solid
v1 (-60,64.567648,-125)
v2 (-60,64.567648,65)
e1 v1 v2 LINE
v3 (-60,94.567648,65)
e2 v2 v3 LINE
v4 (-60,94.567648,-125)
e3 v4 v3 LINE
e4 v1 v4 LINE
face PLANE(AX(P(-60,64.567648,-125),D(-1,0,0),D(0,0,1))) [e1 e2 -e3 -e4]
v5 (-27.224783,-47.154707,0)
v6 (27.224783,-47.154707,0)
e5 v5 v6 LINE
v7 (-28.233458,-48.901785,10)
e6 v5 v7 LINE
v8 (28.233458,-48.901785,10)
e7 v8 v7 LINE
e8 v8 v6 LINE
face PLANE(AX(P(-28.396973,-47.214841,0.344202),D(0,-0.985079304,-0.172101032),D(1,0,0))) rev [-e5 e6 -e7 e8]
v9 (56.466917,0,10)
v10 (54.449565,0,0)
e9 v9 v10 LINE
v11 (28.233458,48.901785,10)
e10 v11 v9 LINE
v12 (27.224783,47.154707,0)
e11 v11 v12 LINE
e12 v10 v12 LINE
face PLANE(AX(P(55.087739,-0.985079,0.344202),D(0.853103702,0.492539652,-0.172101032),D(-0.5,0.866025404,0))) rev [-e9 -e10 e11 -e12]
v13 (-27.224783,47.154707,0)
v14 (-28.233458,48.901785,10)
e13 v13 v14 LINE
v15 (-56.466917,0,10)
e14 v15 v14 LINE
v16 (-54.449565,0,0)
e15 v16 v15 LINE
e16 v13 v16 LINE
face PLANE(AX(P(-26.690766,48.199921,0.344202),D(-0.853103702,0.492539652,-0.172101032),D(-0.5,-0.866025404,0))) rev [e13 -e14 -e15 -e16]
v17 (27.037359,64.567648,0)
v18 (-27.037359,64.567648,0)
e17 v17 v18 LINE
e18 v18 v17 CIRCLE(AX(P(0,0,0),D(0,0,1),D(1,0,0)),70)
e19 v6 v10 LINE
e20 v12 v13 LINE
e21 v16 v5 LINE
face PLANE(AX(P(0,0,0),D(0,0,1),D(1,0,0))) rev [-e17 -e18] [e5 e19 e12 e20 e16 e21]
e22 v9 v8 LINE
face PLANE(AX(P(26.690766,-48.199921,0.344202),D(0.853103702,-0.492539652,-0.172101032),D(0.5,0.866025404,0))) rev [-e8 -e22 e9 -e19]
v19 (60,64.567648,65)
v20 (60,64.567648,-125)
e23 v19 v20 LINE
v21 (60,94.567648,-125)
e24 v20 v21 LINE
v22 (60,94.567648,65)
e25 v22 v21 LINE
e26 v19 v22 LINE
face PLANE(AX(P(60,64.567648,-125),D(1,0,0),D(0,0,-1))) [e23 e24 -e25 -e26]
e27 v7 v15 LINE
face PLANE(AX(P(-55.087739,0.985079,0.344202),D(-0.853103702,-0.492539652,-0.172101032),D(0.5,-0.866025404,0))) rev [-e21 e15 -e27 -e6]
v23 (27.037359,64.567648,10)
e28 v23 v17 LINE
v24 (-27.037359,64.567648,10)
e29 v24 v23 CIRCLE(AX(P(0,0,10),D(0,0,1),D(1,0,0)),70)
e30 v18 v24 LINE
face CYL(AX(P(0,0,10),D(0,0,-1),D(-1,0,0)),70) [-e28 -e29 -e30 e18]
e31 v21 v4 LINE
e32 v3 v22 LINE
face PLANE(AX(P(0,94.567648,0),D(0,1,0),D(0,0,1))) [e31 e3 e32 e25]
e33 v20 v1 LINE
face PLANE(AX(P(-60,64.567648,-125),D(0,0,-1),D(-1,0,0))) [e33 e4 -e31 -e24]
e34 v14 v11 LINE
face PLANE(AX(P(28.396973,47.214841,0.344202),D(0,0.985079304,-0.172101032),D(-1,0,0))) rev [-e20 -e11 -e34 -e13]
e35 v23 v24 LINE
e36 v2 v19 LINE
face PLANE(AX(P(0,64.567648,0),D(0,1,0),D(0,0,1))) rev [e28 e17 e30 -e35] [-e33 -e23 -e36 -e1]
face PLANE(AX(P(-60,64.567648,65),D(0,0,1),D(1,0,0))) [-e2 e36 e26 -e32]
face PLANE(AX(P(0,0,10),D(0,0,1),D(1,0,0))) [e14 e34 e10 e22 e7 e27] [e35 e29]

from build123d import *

# Parameters (mm, degrees)
ESQUISSE1_R               = 70
BOSS_EXTRU_1_DEPTH        = 10
CHANFREIN1_SIZE           = 10.000000024
CHANFREIN1_SIZE_2         = 1.74707794
D_PLACER_START            = -32.160153846
D_PLACER_LA_FACE1_DEPTH   = 61.565802755
D_PLACER_START_2          = -29.405648909
D_PLACER_LA_FACE1_2_DEPTH = 58.811297818
D_PLACER_LA_FACE1_3_DEPTH = 58.811297818
ESQUISSE2_W               = 120
ESQUISSE2_H               = 190
BOSS_EXTRU_2_DEPTH        = 30


with BuildPart() as part:
    # Esquisse1 → Boss.-Extru.1 (new body)
    with BuildSketch(Plane.XY):
        Circle(ESQUISSE1_R)
        Polygon((56.79394598, 0), (28.39697299, 49.185), (-28.39697299, 49.185), (-56.79394598, 0), (-28.39697299, -49.185), (28.39697299, -49.185), align=None, mode=Mode.SUBTRACT)
    extrude(amount=BOSS_EXTRU_1_DEPTH)

    # Chanfrein1
    # the kernel refuses this chamfer: 10.000000024, 1.74707794 mm, written as the material it takes off along each edge
    with BuildSketch(Plane(origin=(-54.38262227, -49.185, 10), x_dir=(0, 0, -1), z_dir=(1, 0, 0))) as chanfrein1_piece_1_section:
        Polygon((CHANFREIN1_SIZE, 0), (0, -CHANFREIN1_SIZE_2), (0, 0), align=None)
    chanfrein1_piece_1 = extrude(amount=108.76524454, mode=Mode.PRIVATE)
    chanfrein1_piece_1 = split(chanfrein1_piece_1, bisect_by=Plane(origin=(7.702074175, -85.029616205, 10), z_dir=(-0.8660254037844389, 0.4999999999999996, 0)), keep=Keep.TOP, mode=Mode.PRIVATE)
    chanfrein1_piece_1 = split(chanfrein1_piece_1, bisect_by=Plane(origin=(-34.89338531, -37.932883795, 10), z_dir=(0.8660254037844386, 0.5000000000000001, 0)), keep=Keep.TOP, mode=Mode.PRIVATE)
    add(chanfrein1_piece_1, mode=Mode.SUBTRACT)
    with BuildSketch(Plane(origin=(15.40414835, -71.68923241, 10), x_dir=(0, 0, -1), z_dir=(0.4999999999999996, 0.8660254037844389, 0))) as chanfrein1_piece_2_section:
        Polygon((CHANFREIN1_SIZE, 0), (0, -CHANFREIN1_SIZE_2), (0, 0), align=None)
    chanfrein1_piece_2 = extrude(amount=108.76524454, mode=Mode.PRIVATE)
    chanfrein1_piece_2 = split(chanfrein1_piece_2, bisect_by=Plane(origin=(15.40414835, -49.185, 10), z_dir=(0, 1, 0)), keep=Keep.TOP, mode=Mode.PRIVATE)
    chanfrein1_piece_2 = split(chanfrein1_piece_2, bisect_by=Plane(origin=(77.488844795, -35.844616205, 10), z_dir=(-0.8660254037844386, -0.5000000000000001, 0)), keep=Keep.TOP, mode=Mode.PRIVATE)
    add(chanfrein1_piece_2, mode=Mode.SUBTRACT)
    with BuildSketch(Plane(origin=(69.78677062, -22.50423241, 10), x_dir=(0, 0, -1), z_dir=(-0.5000000000000001, 0.8660254037844386, 0))) as chanfrein1_piece_3_section:
        Polygon((CHANFREIN1_SIZE, 0), (0, -CHANFREIN1_SIZE_2), (0, 0), align=None)
    chanfrein1_piece_3 = extrude(amount=108.76524454, mode=Mode.PRIVATE)
    chanfrein1_piece_3 = split(chanfrein1_piece_3, bisect_by=Plane(origin=(50.29753366, -11.252116205, 10), z_dir=(-0.8660254037844389, 0.4999999999999996, 0)), keep=Keep.TOP, mode=Mode.PRIVATE)
    chanfrein1_piece_3 = split(chanfrein1_piece_3, bisect_by=Plane(origin=(69.78677062, 49.185, 10), z_dir=(0, -1, 0)), keep=Keep.TOP, mode=Mode.PRIVATE)
    add(chanfrein1_piece_3, mode=Mode.SUBTRACT)
    with BuildSketch(Plane(origin=(54.38262227, 49.185, 10), x_dir=(0, 0, -1), z_dir=(-1, 0, 0))) as chanfrein1_piece_4_section:
        Polygon((CHANFREIN1_SIZE, 0), (0, -CHANFREIN1_SIZE_2), (0, 0), align=None)
    chanfrein1_piece_4 = extrude(amount=108.76524454, mode=Mode.PRIVATE)
    chanfrein1_piece_4 = split(chanfrein1_piece_4, bisect_by=Plane(origin=(-7.702074175, 85.029616205, 10), z_dir=(0.8660254037844388, -0.4999999999999998, 0)), keep=Keep.TOP, mode=Mode.PRIVATE)
    chanfrein1_piece_4 = split(chanfrein1_piece_4, bisect_by=Plane(origin=(34.89338531, 37.932883795, 10), z_dir=(-0.8660254037844386, -0.5000000000000001, 0)), keep=Keep.TOP, mode=Mode.PRIVATE)
    add(chanfrein1_piece_4, mode=Mode.SUBTRACT)
    with BuildSketch(Plane(origin=(-15.40414835, 71.68923241, 10), x_dir=(0, 0, -1), z_dir=(-0.4999999999999998, -0.8660254037844388, 0))) as chanfrein1_piece_5_section:
        Polygon((CHANFREIN1_SIZE, 0), (0, -CHANFREIN1_SIZE_2), (0, 0), align=None)
    chanfrein1_piece_5 = extrude(amount=108.76524454, mode=Mode.PRIVATE)
    chanfrein1_piece_5 = split(chanfrein1_piece_5, bisect_by=Plane(origin=(-77.488844795, 35.844616205, 10), z_dir=(0.8660254037844386, 0.5000000000000001, 0)), keep=Keep.TOP, mode=Mode.PRIVATE)
    chanfrein1_piece_5 = split(chanfrein1_piece_5, bisect_by=Plane(origin=(-15.40414835, 49.185, 10), z_dir=(0, -1, 0)), keep=Keep.TOP, mode=Mode.PRIVATE)
    add(chanfrein1_piece_5, mode=Mode.SUBTRACT)
    with BuildSketch(Plane(origin=(-69.78677062, 22.50423241, 10), x_dir=(0, 0, -1), z_dir=(0.5000000000000001, -0.8660254037844386, 0))) as chanfrein1_piece_6_section:
        Polygon((CHANFREIN1_SIZE, 0), (0, -CHANFREIN1_SIZE_2), (0, 0), align=None)
    chanfrein1_piece_6 = extrude(amount=108.76524454, mode=Mode.PRIVATE)
    chanfrein1_piece_6 = split(chanfrein1_piece_6, bisect_by=Plane(origin=(-69.78677062, -49.185, 10), z_dir=(0, 1, 0)), keep=Keep.TOP, mode=Mode.PRIVATE)
    chanfrein1_piece_6 = split(chanfrein1_piece_6, bisect_by=Plane(origin=(-50.29753366, 11.252116205, 10), z_dir=(0.8660254037844388, -0.4999999999999998, 0)), keep=Keep.TOP, mode=Mode.PRIVATE)
    add(chanfrein1_piece_6, mode=Mode.SUBTRACT)
    with BuildSketch(Plane(origin=(-54.38262227, -49.185, 10), x_dir=(0, 0, -1), z_dir=(1, 0, 0))) as chanfrein1_piece_7a_section:
        Polygon((CHANFREIN1_SIZE, 0), (0, -CHANFREIN1_SIZE_2), (0, 0), align=None)
    chanfrein1_piece_7a = extrude(amount=108.76524454, mode=Mode.PRIVATE)
    chanfrein1_piece_7a = split(chanfrein1_piece_7a, bisect_by=Plane(origin=(-34.89338531, -37.932883795, 10), z_dir=(-0.8660254037844386, -0.5000000000000001, 0)), keep=Keep.TOP, mode=Mode.PRIVATE)
    with BuildSketch(Plane(origin=(-69.78677062, 22.50423241, 10), x_dir=(0, 0, -1), z_dir=(0.5000000000000001, -0.8660254037844386, 0))) as chanfrein1_piece_7b_section:
        Polygon((CHANFREIN1_SIZE, 0), (0, -CHANFREIN1_SIZE_2), (0, 0), align=None)
    chanfrein1_piece_7b = extrude(amount=108.76524454, mode=Mode.PRIVATE)
    chanfrein1_piece_7b = split(chanfrein1_piece_7b, bisect_by=Plane(origin=(-69.78677062, -49.185, 10), z_dir=(0, -1, 0)), keep=Keep.TOP, mode=Mode.PRIVATE)
    chanfrein1_piece_7 = chanfrein1_piece_7a & chanfrein1_piece_7b
    add(chanfrein1_piece_7, mode=Mode.SUBTRACT)
    with BuildSketch(Plane(origin=(15.40414835, -71.68923241, 10), x_dir=(0, 0, -1), z_dir=(0.4999999999999996, 0.8660254037844389, 0))) as chanfrein1_piece_8a_section:
        Polygon((CHANFREIN1_SIZE, 0), (0, -CHANFREIN1_SIZE_2), (0, 0), align=None)
    chanfrein1_piece_8a = extrude(amount=108.76524454, mode=Mode.PRIVATE)
    chanfrein1_piece_8a = split(chanfrein1_piece_8a, bisect_by=Plane(origin=(15.40414835, -49.185, 10), z_dir=(0, -1, 0)), keep=Keep.TOP, mode=Mode.PRIVATE)
    with BuildSketch(Plane(origin=(-54.38262227, -49.185, 10), x_dir=(0, 0, -1), z_dir=(1, 0, 0))) as chanfrein1_piece_8b_section:
        Polygon((CHANFREIN1_SIZE, 0), (0, -CHANFREIN1_SIZE_2), (0, 0), align=None)
    chanfrein1_piece_8b = extrude(amount=108.76524454, mode=Mode.PRIVATE)
    chanfrein1_piece_8b = split(chanfrein1_piece_8b, bisect_by=Plane(origin=(7.702074175, -85.029616205, 10), z_dir=(0.8660254037844389, -0.4999999999999996, 0)), keep=Keep.TOP, mode=Mode.PRIVATE)
    chanfrein1_piece_8 = chanfrein1_piece_8a & chanfrein1_piece_8b
    add(chanfrein1_piece_8, mode=Mode.SUBTRACT)
    with BuildSketch(Plane(origin=(15.40414835, -71.68923241, 10), x_dir=(0, 0, -1), z_dir=(0.4999999999999996, 0.8660254037844389, 0))) as chanfrein1_piece_9a_section:
        Polygon((CHANFREIN1_SIZE, 0), (0, -CHANFREIN1_SIZE_2), (0, 0), align=None)
    chanfrein1_piece_9a = extrude(amount=108.76524454, mode=Mode.PRIVATE)
    chanfrein1_piece_9a = split(chanfrein1_piece_9a, bisect_by=Plane(origin=(77.488844795, -35.844616205, 10), z_dir=(0.8660254037844386, 0.5000000000000001, 0)), keep=Keep.TOP, mode=Mode.PRIVATE)
    with BuildSketch(Plane(origin=(69.78677062, -22.50423241, 10), x_dir=(0, 0, -1), z_dir=(-0.5000000000000001, 0.8660254037844386, 0))) as chanfrein1_piece_9b_section:
        Polygon((CHANFREIN1_SIZE, 0), (0, -CHANFREIN1_SIZE_2), (0, 0), align=None)
    chanfrein1_piece_9b = extrude(amount=108.76524454, mode=Mode.PRIVATE)
    chanfrein1_piece_9b = split(chanfrein1_piece_9b, bisect_by=Plane(origin=(50.29753366, -11.252116205, 10), z_dir=(0.8660254037844389, -0.4999999999999996, 0)), keep=Keep.TOP, mode=Mode.PRIVATE)
    chanfrein1_piece_9 = chanfrein1_piece_9a & chanfrein1_piece_9b
    add(chanfrein1_piece_9, mode=Mode.SUBTRACT)
    with BuildSketch(Plane(origin=(54.38262227, 49.185, 10), x_dir=(0, 0, -1), z_dir=(-1, 0, 0))) as chanfrein1_piece_10a_section:
        Polygon((CHANFREIN1_SIZE, 0), (0, -CHANFREIN1_SIZE_2), (0, 0), align=None)
    chanfrein1_piece_10a = extrude(amount=108.76524454, mode=Mode.PRIVATE)
    chanfrein1_piece_10a = split(chanfrein1_piece_10a, bisect_by=Plane(origin=(34.89338531, 37.932883795, 10), z_dir=(0.8660254037844386, 0.5000000000000001, 0)), keep=Keep.TOP, mode=Mode.PRIVATE)
    with BuildSketch(Plane(origin=(69.78677062, -22.50423241, 10), x_dir=(0, 0, -1), z_dir=(-0.5000000000000001, 0.8660254037844386, 0))) as chanfrein1_piece_10b_section:
        Polygon((CHANFREIN1_SIZE, 0), (0, -CHANFREIN1_SIZE_2), (0, 0), align=None)
    chanfrein1_piece_10b = extrude(amount=108.76524454, mode=Mode.PRIVATE)
    chanfrein1_piece_10b = split(chanfrein1_piece_10b, bisect_by=Plane(origin=(69.78677062, 49.185, 10), z_dir=(0, 1, 0)), keep=Keep.TOP, mode=Mode.PRIVATE)
    chanfrein1_piece_10 = chanfrein1_piece_10a & chanfrein1_piece_10b
    add(chanfrein1_piece_10, mode=Mode.SUBTRACT)
    with BuildSketch(Plane(origin=(-15.40414835, 71.68923241, 10), x_dir=(0, 0, -1), z_dir=(-0.4999999999999998, -0.8660254037844388, 0))) as chanfrein1_piece_11a_section:
        Polygon((CHANFREIN1_SIZE, 0), (0, -CHANFREIN1_SIZE_2), (0, 0), align=None)
    chanfrein1_piece_11a = extrude(amount=108.76524454, mode=Mode.PRIVATE)
    chanfrein1_piece_11a = split(chanfrein1_piece_11a, bisect_by=Plane(origin=(-15.40414835, 49.185, 10), z_dir=(0, 1, 0)), keep=Keep.TOP, mode=Mode.PRIVATE)
    with BuildSketch(Plane(origin=(54.38262227, 49.185, 10), x_dir=(0, 0, -1), z_dir=(-1, 0, 0))) as chanfrein1_piece_11b_section:
        Polygon((CHANFREIN1_SIZE, 0), (0, -CHANFREIN1_SIZE_2), (0, 0), align=None)
    chanfrein1_piece_11b = extrude(amount=108.76524454, mode=Mode.PRIVATE)
    chanfrein1_piece_11b = split(chanfrein1_piece_11b, bisect_by=Plane(origin=(-7.702074175, 85.029616205, 10), z_dir=(-0.8660254037844388, 0.4999999999999998, 0)), keep=Keep.TOP, mode=Mode.PRIVATE)
    chanfrein1_piece_11 = chanfrein1_piece_11a & chanfrein1_piece_11b
    add(chanfrein1_piece_11, mode=Mode.SUBTRACT)
    with BuildSketch(Plane(origin=(-69.78677062, 22.50423241, 10), x_dir=(0, 0, -1), z_dir=(0.5000000000000001, -0.8660254037844386, 0))) as chanfrein1_piece_12a_section:
        Polygon((CHANFREIN1_SIZE, 0), (0, -CHANFREIN1_SIZE_2), (0, 0), align=None)
    chanfrein1_piece_12a = extrude(amount=108.76524454, mode=Mode.PRIVATE)
    chanfrein1_piece_12a = split(chanfrein1_piece_12a, bisect_by=Plane(origin=(-50.29753366, 11.252116205, 10), z_dir=(-0.8660254037844388, 0.4999999999999998, 0)), keep=Keep.TOP, mode=Mode.PRIVATE)
    with BuildSketch(Plane(origin=(-15.40414835, 71.68923241, 10), x_dir=(0, 0, -1), z_dir=(-0.4999999999999998, -0.8660254037844388, 0))) as chanfrein1_piece_12b_section:
        Polygon((CHANFREIN1_SIZE, 0), (0, -CHANFREIN1_SIZE_2), (0, 0), align=None)
    chanfrein1_piece_12b = extrude(amount=108.76524454, mode=Mode.PRIVATE)
    chanfrein1_piece_12b = split(chanfrein1_piece_12b, bisect_by=Plane(origin=(-77.488844795, 35.844616205, 10), z_dir=(-0.8660254037844386, -0.5000000000000001, 0)), keep=Keep.TOP, mode=Mode.PRIVATE)
    chanfrein1_piece_12 = chanfrein1_piece_12a & chanfrein1_piece_12b
    add(chanfrein1_piece_12, mode=Mode.SUBTRACT)

    # Déplacer la face1: read off the stored shape, not the designer's step
    # Déplacer la face1 outline → Déplacer la face1 (add)
    with BuildSketch(Plane.YZ.offset(D_PLACER_START)):
        Polygon((49.185000004, -1e-09), (50.93207794, 10), (48.901784549, 10), (47.154706614, 0), align=None)
        Polygon((-47.154706614, 0), (-48.901784549, 10), (-50.93207794, 10), (-49.185000004, -1e-09), align=None)
    extrude(amount=D_PLACER_LA_FACE1_DEPTH)

    # D_placer la face1 2 outline → D_placer la face1 2 (add)
    with BuildSketch(Plane(origin=(0, 0, 0), x_dir=(0.8660254037844389, -0.49999999999999956, 0), z_dir=(0.4999999999999996, 0.8660254037844388, 0)).offset(D_PLACER_START_2)):
        Polygon((-49.185000004, 1e-09), (-50.93207794, -10), (-48.901784549, -10), (-47.154706614, 0), align=None)
        Polygon((47.154706614, 0), (48.901784549, -10), (50.93207794, -10), (49.185000004, 1e-09), align=None)
    extrude(amount=D_PLACER_LA_FACE1_2_DEPTH)

    # D_placer la face1 3 outline → D_placer la face1 3 (add)
    with BuildSketch(Plane(origin=(0, 0, 0), x_dir=(0.8660254037844386, 0.5000000000000001, 0), z_dir=(0.5000000000000001, -0.8660254037844386, 0)).offset(D_PLACER_START_2)):
        Polygon((49.185000004, -1e-09), (50.93207794, 10), (48.901784549, 10), (47.154706614, 0), align=None)
        Polygon((-47.154706614, 0), (-48.901784549, 10), (-50.93207794, 10), (-49.185000004, -1e-09), align=None)
    extrude(amount=D_PLACER_LA_FACE1_3_DEPTH)

    # Esquisse2 → Boss.-Extru.2 (add)
    with BuildSketch(Plane(origin=(0, 94.56764827, 0), x_dir=(1, 0, 0), z_dir=(0, 1, 0))):
        with Locations((0, 30)):
            Rectangle(ESQUISSE2_W, ESQUISSE2_H)
    extrude(amount=-BOSS_EXTRU_2_DEPTH)


solid = part.part
